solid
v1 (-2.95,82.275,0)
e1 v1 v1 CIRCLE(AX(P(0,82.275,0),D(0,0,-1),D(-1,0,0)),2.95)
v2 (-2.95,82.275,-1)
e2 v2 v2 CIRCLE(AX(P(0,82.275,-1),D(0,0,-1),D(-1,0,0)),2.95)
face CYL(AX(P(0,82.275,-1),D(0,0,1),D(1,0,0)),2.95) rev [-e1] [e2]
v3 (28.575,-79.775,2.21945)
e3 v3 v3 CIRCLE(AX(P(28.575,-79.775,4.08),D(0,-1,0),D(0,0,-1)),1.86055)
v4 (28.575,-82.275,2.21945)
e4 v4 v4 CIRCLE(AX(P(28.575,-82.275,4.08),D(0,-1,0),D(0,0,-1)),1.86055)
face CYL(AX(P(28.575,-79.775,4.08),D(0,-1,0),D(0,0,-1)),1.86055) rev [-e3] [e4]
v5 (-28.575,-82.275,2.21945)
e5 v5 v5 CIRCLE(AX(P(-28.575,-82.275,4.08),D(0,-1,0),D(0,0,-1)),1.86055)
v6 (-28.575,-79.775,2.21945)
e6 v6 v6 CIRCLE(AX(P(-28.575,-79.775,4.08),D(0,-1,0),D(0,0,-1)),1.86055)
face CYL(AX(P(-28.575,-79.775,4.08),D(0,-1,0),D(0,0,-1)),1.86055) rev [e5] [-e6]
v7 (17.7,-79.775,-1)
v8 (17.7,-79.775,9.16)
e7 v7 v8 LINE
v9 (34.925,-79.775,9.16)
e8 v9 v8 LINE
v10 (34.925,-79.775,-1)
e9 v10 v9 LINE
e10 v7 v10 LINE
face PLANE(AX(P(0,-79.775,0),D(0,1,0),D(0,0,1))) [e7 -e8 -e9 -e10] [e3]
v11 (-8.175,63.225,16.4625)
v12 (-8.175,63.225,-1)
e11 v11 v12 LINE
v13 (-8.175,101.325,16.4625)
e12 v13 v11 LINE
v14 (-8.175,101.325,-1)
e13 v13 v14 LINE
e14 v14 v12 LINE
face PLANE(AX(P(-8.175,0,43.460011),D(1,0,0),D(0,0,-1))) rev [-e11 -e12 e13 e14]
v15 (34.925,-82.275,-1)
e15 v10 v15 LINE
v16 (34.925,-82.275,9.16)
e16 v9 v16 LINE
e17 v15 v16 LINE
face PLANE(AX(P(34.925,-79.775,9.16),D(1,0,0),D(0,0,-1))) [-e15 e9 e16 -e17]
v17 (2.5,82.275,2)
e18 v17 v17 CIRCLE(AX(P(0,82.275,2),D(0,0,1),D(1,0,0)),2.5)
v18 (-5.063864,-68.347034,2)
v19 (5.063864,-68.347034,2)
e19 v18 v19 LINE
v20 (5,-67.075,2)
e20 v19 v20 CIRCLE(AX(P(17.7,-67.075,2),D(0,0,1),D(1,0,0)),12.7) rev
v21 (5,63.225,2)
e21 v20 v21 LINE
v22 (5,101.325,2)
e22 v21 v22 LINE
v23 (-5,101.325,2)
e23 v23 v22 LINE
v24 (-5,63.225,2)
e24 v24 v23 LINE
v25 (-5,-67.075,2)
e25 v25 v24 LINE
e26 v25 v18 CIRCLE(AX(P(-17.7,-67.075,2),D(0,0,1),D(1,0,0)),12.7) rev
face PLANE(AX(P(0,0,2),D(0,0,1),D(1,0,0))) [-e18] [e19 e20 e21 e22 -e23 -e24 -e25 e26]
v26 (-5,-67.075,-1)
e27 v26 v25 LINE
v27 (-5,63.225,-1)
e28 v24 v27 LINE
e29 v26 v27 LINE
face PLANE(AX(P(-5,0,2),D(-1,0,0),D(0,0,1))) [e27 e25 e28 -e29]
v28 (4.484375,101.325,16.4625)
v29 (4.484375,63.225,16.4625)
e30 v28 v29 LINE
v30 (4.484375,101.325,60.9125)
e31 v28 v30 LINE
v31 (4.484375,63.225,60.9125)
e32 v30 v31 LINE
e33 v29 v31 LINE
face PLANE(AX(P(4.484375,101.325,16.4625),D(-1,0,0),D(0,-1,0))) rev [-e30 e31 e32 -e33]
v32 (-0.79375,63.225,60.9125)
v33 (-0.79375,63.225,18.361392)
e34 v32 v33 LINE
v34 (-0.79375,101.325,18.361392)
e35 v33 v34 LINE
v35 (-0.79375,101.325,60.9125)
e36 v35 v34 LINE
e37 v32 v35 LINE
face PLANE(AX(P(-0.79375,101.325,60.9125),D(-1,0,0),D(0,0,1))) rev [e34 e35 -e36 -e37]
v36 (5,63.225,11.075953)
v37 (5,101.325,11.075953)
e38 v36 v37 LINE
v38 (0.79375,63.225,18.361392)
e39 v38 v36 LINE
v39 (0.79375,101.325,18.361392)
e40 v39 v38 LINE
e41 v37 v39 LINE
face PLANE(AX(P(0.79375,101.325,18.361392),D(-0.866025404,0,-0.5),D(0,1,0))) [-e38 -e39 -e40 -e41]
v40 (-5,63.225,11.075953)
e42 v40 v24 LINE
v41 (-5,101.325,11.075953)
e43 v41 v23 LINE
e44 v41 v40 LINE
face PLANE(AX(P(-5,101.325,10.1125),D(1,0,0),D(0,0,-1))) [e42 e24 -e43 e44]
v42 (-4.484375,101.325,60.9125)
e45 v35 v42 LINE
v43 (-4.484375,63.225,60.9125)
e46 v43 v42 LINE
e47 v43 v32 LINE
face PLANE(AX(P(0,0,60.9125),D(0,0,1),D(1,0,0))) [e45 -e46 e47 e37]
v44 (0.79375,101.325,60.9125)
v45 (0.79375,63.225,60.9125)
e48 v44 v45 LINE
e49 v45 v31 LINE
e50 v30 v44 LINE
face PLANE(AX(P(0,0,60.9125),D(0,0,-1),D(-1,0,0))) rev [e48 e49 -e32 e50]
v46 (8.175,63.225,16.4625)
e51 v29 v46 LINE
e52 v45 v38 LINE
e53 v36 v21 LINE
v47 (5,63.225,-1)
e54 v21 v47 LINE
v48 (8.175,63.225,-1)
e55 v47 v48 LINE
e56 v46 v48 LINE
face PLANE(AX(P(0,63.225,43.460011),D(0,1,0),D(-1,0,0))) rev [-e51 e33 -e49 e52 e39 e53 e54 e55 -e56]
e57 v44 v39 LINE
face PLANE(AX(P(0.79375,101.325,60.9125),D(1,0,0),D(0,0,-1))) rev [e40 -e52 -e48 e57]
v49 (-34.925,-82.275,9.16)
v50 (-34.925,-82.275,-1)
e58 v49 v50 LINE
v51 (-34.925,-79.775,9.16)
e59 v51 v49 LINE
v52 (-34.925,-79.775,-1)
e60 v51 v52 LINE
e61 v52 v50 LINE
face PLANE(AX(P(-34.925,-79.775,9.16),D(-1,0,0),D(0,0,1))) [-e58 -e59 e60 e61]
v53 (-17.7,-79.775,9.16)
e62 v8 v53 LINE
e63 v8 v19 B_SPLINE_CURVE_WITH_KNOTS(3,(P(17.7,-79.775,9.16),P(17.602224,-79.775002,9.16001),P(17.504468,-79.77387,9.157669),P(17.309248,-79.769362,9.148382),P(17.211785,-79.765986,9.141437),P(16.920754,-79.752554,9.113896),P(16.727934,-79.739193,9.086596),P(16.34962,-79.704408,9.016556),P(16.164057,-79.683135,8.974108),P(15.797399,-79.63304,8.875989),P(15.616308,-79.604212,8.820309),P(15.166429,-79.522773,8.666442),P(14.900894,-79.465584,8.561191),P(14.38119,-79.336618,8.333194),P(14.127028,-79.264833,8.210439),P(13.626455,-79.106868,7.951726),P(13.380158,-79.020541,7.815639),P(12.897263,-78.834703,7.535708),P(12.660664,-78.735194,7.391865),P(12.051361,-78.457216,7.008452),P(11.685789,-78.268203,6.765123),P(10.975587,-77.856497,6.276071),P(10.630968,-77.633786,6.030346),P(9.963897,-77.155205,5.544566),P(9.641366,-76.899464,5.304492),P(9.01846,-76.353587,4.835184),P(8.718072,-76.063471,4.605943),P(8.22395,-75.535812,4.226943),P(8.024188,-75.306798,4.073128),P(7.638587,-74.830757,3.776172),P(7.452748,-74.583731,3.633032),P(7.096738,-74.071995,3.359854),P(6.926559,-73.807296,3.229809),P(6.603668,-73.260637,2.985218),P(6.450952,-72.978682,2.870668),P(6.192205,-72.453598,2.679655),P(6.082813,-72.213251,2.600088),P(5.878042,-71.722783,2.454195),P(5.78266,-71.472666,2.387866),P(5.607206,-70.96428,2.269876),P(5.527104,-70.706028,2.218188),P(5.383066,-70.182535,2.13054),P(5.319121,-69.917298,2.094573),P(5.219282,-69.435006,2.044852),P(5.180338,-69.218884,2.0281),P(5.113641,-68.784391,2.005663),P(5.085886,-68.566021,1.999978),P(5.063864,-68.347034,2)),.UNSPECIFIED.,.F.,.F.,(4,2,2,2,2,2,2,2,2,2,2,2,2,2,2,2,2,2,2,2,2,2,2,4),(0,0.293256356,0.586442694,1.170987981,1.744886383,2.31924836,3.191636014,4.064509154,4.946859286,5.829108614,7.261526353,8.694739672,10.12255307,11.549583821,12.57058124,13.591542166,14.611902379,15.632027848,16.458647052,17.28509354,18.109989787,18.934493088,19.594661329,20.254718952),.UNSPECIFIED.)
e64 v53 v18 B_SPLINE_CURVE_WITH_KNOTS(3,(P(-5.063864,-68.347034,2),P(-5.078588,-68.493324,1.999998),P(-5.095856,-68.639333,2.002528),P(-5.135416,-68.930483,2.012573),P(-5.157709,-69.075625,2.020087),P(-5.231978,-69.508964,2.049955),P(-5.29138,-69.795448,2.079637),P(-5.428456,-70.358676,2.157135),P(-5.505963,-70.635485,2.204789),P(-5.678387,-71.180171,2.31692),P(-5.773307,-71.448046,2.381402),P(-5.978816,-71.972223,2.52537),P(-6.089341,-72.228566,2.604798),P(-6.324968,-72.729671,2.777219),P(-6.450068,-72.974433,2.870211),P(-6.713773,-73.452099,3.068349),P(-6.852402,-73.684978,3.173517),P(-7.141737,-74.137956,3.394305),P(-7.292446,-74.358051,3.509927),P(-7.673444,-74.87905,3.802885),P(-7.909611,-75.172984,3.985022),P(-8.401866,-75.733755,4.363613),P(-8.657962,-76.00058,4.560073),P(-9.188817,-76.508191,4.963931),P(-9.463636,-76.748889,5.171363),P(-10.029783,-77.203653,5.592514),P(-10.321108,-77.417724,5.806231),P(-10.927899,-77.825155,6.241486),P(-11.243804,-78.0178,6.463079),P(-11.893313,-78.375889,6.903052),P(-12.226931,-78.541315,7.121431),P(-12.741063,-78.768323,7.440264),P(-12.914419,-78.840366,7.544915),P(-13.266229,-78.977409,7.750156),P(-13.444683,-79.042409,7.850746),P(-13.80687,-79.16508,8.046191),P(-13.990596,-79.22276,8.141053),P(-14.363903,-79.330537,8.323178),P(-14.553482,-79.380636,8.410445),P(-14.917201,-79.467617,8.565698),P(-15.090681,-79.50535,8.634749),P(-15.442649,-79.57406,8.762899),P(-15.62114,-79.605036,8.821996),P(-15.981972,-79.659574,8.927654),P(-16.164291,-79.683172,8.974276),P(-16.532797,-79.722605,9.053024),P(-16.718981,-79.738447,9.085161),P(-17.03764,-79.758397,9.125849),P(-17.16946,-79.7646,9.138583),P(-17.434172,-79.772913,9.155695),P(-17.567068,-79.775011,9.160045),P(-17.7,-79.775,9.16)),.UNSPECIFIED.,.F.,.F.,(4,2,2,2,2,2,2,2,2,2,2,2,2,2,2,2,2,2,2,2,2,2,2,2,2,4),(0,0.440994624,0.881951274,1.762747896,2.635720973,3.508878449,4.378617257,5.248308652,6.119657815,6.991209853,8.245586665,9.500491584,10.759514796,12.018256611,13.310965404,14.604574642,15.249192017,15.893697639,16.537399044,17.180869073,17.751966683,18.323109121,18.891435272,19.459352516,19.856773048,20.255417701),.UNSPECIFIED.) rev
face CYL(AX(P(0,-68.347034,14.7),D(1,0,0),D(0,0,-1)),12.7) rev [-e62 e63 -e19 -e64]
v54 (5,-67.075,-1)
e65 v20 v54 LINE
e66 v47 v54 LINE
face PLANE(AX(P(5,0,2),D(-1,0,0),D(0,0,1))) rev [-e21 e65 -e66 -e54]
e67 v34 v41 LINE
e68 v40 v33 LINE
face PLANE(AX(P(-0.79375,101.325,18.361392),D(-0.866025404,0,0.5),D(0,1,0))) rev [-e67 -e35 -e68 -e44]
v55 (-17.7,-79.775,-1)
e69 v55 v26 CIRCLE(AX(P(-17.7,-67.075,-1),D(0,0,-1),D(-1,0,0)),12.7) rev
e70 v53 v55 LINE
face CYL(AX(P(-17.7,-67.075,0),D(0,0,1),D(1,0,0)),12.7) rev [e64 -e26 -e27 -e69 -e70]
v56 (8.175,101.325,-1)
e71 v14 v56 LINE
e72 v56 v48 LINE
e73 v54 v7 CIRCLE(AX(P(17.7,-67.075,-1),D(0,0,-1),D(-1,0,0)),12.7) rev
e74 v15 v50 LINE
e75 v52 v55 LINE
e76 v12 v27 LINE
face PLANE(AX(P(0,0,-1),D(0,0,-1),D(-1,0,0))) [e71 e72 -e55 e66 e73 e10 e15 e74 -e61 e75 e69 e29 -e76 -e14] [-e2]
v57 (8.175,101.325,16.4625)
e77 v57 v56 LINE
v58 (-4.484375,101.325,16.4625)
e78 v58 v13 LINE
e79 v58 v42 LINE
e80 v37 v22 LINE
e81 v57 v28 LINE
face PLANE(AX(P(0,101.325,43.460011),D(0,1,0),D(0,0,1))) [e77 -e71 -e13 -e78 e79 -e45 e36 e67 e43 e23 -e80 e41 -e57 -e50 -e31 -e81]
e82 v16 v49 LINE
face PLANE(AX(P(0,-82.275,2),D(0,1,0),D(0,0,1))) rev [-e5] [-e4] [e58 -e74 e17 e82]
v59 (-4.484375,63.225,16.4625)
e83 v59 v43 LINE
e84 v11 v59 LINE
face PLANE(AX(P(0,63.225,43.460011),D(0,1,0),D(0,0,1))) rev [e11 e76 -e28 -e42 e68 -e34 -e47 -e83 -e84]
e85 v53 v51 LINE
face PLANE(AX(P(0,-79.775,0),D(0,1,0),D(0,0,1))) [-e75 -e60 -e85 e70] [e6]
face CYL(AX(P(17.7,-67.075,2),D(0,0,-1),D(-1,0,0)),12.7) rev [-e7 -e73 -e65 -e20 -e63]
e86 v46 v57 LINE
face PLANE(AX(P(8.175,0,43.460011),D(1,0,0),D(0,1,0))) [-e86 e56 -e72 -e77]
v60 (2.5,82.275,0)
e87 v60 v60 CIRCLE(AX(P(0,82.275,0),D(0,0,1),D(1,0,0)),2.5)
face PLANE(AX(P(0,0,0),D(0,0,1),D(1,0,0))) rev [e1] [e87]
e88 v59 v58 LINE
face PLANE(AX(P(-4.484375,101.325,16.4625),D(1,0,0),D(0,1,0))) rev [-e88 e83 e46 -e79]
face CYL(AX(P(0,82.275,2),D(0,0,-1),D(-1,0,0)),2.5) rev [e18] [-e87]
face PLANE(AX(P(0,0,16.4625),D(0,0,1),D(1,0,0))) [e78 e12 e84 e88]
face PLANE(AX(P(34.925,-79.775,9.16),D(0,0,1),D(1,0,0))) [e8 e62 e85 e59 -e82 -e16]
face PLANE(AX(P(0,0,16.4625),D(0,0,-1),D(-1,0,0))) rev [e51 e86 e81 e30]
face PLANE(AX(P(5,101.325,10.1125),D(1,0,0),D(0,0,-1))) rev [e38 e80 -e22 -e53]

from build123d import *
from build123d.topology import SkipClean

# Parameters (mm, degrees)
SKETCH1_W           = 10
SKETCH1_H           = 170.55
SKETCH1_R           = 2.5
BOSS_EXTRUDE1_DEPTH = 2
SKETCH2_W           = 10
SKETCH2_H           = 170.55
SKETCH2_R           = 2.95
BOSS_EXTRUDE2_DEPTH = 1
SKETCH3_W           = 69.85
SKETCH3_H           = 10.16
SKETCH3_R           = 1.86055
BOSS_EXTRUDE3_DEPTH = 2.5
FILLET1_START       = -1
FILLET1_DEPTH       = 10.16
FILLET1_START_2     = -17.7000001
FILLET1_2_DEPTH     = 35.4000001
FILLET1_START_3     = -5
FILLET1_3_DEPTH     = 10
SKETCH4_W           = 10
SKETCH4_H           = 13.05
BOSS_EXTRUDE4_DEPTH = 3
SKETCH4_3_W         = 3.175
SKETCH4_3_H         = 38.1
BOSS_EXTRUDE5_DEPTH = 11.1125
SKETCH5_W           = 7.38125
SKETCH5_H           = 38.1
BOSS_EXTRUDE6_DEPTH = 50.8
SKETCH6_W           = 3.690625
SKETCH6_H           = 38.1
CUT_EXTRUDE1_DEPTH  = 44.45
CHAMFER1_SIZE       = 4.7625
CHAMFER1_SIZE_2     = 8.248891971


with BuildPart() as part:
    # Sketch1 → Boss-Extrude1 (new body)
    with BuildSketch(Plane.XY):
        with Locations((0, 3)):
            Rectangle(SKETCH1_W, SKETCH1_H)
        with Locations((0, 82.275)):
            Circle(SKETCH1_R, mode=Mode.SUBTRACT)
    extrude(amount=BOSS_EXTRUDE1_DEPTH)

    # Sketch2 → Boss-Extrude2 (add)
    with BuildSketch(Plane(origin=(0, 0, 0), x_dir=(-1, 0, 0), z_dir=(0, 0, -1))):
        with Locations((0, 3)):
            Rectangle(SKETCH2_W, SKETCH2_H)
        with Locations((0, 82.275)):
            Circle(SKETCH2_R, mode=Mode.SUBTRACT)
    extrude(amount=BOSS_EXTRUDE2_DEPTH)

    # Sketch3 → Boss-Extrude3 (add)
    with BuildSketch(Plane.XZ.offset(82.275)):
        with Locations((0, 4.08)):
            Rectangle(SKETCH3_W, SKETCH3_H)
        with Locations(Location((28.575, 4.08, 0), (0, 0, 270))):
            Circle(SKETCH3_R, mode=Mode.SUBTRACT)
        with Locations(Location((-28.575, 4.08, 0), (0, 0, 270))):
            Circle(SKETCH3_R, mode=Mode.SUBTRACT)
    extrude(amount=-BOSS_EXTRUDE3_DEPTH)

    # Fillet1: read off the stored shape, not the designer's step
    # Fillet1 outline → Fillet1 (add)
    with BuildSketch(Plane.XY.offset(FILLET1_START)):
        with BuildLine():
            Line((5, -79.775), (17.7, -79.775))
            ThreePointArc((17.7, -79.775), (8.719743879, -76.055256121), (5, -67.075))
            Line((5, -67.075), (5, -79.775))
        make_face()
        with BuildLine():
            Line((-17.7, -79.775), (-5, -79.775))
            Line((-5, -79.775), (-5, -67.075))
            ThreePointArc((-5, -67.075), (-8.719743879, -76.055256121), (-17.7, -79.775))
        make_face()
    extrude(amount=FILLET1_DEPTH)

    # Fillet1 2 outline → Fillet1 2 (cut)
    with BuildSketch(Plane.YZ.offset(FILLET1_START_2)):
        with BuildLine():
            Line((-66, 9.16), (-79.775009155, 9.160018885))
            ThreePointArc((-79.775009155, 9.160018885), (-75.089891257, 3.937849653), (-68.347034302, 2))
            Line((-68.347034302, 2), (-66, 2))
            Line((-66, 2), (-66, 9.16))
        make_face()
    extrude(amount=FILLET1_2_DEPTH, mode=Mode.SUBTRACT)

    # Fillet1 3 outline → Fillet1 3 (add)
    with SkipClean():  # the faces are left unmerged after this step: merging them gives an invalid solid
        with BuildSketch(Plane.YZ.offset(FILLET1_START_3)):
            with BuildLine():
                ThreePointArc((-68.347034302, 2), (-75.089891257, 3.937849653), (-79.775009155, 9.160018885))
                Line((-79.775009155, 9.160018885), (-79.775, 0))
                Line((-79.775, 0), (-66, 0))
                Line((-66, 0), (-66, 2))
                Line((-66, 2), (-68.347034302, 2))
            make_face()
        extrude(amount=FILLET1_3_DEPTH)
    add(part.part.scale(1), mode=Mode.REPLACE)  # the faces are merged on a copy

    # Sketch4 → Boss-Extrude4 (add)
    with SkipClean():  # the faces are left unmerged after this step: merging them gives an invalid solid
        with BuildSketch(Plane(origin=(0, 0, -1), x_dir=(-1, 0, 0), z_dir=(0, 0, -1))):
            Polygon((8.175, 63.225), (8.175, 101.325), (5, 101.325), (5, 88.275), (5, 63.225), align=None)
            with Locations((0, 94.8)):
                Rectangle(SKETCH4_W, SKETCH4_H)
            Polygon((-5, 88.275), (-5, 101.325), (-8.175, 101.325), (-8.175, 63.225), (-5, 63.225), align=None)
        extrude(amount=-BOSS_EXTRUDE4_DEPTH)

    # Sketch4<3> → Boss-Extrude5 (add)
    with SkipClean():  # the faces are left unmerged after this step: merging them gives an invalid solid
        with BuildSketch(Plane(origin=(0, 0, -1), x_dir=(-1, 0, 0), z_dir=(0, 0, -1))):
            with Locations((6.5875, 82.275)):
                Rectangle(SKETCH4_3_W, SKETCH4_3_H)
            with Locations((-6.5875, 82.275)):
                Rectangle(SKETCH4_3_W, SKETCH4_3_H)
        extrude(amount=-BOSS_EXTRUDE5_DEPTH)

    # Sketch5 → Boss-Extrude6 (add)
    with SkipClean():  # the faces are left unmerged after this step: merging them gives an invalid solid
        with BuildSketch(Plane.XY.offset(10.1125)):
            with Locations((-4.484375, 82.275)):
                Rectangle(SKETCH5_W, SKETCH5_H)
            with Locations((4.484375, 82.275)):
                Rectangle(SKETCH5_W, SKETCH5_H)
        extrude(amount=BOSS_EXTRUDE6_DEPTH)

    # Sketch6 → Cut-Extrude1 (cut)
    with SkipClean():  # the faces are left unmerged after this step: merging them gives an invalid solid
        with BuildSketch(Plane.XY.offset(60.9125)):
            with Locations((-6.3296875, 82.275)):
                Rectangle(SKETCH6_W, SKETCH6_H)
            with Locations((6.3296875, 82.275)):
                Rectangle(SKETCH6_W, SKETCH6_H)
        extrude(amount=-CUT_EXTRUDE1_DEPTH, mode=Mode.SUBTRACT)

    # Chamfer1
    # the kernel refuses this chamfer: 8.248891971, 4.7625 mm, written as the material it takes off along each edge
    with BuildSketch(Plane(origin=(-0.79375, 122.66559091, 10.1125), x_dir=(-1, 0, 0), z_dir=(0, -1, 0))) as chamfer1_piece_1_section:
        Polygon((CHAMFER1_SIZE, 0), (0, -CHAMFER1_SIZE_2), (0, 0), align=None)
    chamfer1_piece_1 = extrude(amount=80.78118182, mode=Mode.PRIVATE)
    chamfer1_piece_1 = split(chamfer1_piece_1, bisect_by=Plane(origin=(-5, 122.66559091, 10.1125), z_dir=(1, 0, 0)), keep=Keep.TOP, mode=Mode.PRIVATE)
    add(chamfer1_piece_1, mode=Mode.SUBTRACT)
    with BuildSketch(Plane(origin=(0.79375, 122.66559091, 10.1125), x_dir=(1, 0, 0), z_dir=(0, -1, 0))) as chamfer1_piece_2_section:
        Polygon((CHAMFER1_SIZE, 0), (0, CHAMFER1_SIZE_2), (0, 0), align=None)
    chamfer1_piece_2 = extrude(amount=80.78118182, mode=Mode.PRIVATE)
    chamfer1_piece_2 = split(chamfer1_piece_2, bisect_by=Plane(origin=(5, 122.66559091, 10.1125), z_dir=(-1, 0, 0)), keep=Keep.TOP, mode=Mode.PRIVATE)
    add(chamfer1_piece_2, mode=Mode.SUBTRACT)


solid = part.part
